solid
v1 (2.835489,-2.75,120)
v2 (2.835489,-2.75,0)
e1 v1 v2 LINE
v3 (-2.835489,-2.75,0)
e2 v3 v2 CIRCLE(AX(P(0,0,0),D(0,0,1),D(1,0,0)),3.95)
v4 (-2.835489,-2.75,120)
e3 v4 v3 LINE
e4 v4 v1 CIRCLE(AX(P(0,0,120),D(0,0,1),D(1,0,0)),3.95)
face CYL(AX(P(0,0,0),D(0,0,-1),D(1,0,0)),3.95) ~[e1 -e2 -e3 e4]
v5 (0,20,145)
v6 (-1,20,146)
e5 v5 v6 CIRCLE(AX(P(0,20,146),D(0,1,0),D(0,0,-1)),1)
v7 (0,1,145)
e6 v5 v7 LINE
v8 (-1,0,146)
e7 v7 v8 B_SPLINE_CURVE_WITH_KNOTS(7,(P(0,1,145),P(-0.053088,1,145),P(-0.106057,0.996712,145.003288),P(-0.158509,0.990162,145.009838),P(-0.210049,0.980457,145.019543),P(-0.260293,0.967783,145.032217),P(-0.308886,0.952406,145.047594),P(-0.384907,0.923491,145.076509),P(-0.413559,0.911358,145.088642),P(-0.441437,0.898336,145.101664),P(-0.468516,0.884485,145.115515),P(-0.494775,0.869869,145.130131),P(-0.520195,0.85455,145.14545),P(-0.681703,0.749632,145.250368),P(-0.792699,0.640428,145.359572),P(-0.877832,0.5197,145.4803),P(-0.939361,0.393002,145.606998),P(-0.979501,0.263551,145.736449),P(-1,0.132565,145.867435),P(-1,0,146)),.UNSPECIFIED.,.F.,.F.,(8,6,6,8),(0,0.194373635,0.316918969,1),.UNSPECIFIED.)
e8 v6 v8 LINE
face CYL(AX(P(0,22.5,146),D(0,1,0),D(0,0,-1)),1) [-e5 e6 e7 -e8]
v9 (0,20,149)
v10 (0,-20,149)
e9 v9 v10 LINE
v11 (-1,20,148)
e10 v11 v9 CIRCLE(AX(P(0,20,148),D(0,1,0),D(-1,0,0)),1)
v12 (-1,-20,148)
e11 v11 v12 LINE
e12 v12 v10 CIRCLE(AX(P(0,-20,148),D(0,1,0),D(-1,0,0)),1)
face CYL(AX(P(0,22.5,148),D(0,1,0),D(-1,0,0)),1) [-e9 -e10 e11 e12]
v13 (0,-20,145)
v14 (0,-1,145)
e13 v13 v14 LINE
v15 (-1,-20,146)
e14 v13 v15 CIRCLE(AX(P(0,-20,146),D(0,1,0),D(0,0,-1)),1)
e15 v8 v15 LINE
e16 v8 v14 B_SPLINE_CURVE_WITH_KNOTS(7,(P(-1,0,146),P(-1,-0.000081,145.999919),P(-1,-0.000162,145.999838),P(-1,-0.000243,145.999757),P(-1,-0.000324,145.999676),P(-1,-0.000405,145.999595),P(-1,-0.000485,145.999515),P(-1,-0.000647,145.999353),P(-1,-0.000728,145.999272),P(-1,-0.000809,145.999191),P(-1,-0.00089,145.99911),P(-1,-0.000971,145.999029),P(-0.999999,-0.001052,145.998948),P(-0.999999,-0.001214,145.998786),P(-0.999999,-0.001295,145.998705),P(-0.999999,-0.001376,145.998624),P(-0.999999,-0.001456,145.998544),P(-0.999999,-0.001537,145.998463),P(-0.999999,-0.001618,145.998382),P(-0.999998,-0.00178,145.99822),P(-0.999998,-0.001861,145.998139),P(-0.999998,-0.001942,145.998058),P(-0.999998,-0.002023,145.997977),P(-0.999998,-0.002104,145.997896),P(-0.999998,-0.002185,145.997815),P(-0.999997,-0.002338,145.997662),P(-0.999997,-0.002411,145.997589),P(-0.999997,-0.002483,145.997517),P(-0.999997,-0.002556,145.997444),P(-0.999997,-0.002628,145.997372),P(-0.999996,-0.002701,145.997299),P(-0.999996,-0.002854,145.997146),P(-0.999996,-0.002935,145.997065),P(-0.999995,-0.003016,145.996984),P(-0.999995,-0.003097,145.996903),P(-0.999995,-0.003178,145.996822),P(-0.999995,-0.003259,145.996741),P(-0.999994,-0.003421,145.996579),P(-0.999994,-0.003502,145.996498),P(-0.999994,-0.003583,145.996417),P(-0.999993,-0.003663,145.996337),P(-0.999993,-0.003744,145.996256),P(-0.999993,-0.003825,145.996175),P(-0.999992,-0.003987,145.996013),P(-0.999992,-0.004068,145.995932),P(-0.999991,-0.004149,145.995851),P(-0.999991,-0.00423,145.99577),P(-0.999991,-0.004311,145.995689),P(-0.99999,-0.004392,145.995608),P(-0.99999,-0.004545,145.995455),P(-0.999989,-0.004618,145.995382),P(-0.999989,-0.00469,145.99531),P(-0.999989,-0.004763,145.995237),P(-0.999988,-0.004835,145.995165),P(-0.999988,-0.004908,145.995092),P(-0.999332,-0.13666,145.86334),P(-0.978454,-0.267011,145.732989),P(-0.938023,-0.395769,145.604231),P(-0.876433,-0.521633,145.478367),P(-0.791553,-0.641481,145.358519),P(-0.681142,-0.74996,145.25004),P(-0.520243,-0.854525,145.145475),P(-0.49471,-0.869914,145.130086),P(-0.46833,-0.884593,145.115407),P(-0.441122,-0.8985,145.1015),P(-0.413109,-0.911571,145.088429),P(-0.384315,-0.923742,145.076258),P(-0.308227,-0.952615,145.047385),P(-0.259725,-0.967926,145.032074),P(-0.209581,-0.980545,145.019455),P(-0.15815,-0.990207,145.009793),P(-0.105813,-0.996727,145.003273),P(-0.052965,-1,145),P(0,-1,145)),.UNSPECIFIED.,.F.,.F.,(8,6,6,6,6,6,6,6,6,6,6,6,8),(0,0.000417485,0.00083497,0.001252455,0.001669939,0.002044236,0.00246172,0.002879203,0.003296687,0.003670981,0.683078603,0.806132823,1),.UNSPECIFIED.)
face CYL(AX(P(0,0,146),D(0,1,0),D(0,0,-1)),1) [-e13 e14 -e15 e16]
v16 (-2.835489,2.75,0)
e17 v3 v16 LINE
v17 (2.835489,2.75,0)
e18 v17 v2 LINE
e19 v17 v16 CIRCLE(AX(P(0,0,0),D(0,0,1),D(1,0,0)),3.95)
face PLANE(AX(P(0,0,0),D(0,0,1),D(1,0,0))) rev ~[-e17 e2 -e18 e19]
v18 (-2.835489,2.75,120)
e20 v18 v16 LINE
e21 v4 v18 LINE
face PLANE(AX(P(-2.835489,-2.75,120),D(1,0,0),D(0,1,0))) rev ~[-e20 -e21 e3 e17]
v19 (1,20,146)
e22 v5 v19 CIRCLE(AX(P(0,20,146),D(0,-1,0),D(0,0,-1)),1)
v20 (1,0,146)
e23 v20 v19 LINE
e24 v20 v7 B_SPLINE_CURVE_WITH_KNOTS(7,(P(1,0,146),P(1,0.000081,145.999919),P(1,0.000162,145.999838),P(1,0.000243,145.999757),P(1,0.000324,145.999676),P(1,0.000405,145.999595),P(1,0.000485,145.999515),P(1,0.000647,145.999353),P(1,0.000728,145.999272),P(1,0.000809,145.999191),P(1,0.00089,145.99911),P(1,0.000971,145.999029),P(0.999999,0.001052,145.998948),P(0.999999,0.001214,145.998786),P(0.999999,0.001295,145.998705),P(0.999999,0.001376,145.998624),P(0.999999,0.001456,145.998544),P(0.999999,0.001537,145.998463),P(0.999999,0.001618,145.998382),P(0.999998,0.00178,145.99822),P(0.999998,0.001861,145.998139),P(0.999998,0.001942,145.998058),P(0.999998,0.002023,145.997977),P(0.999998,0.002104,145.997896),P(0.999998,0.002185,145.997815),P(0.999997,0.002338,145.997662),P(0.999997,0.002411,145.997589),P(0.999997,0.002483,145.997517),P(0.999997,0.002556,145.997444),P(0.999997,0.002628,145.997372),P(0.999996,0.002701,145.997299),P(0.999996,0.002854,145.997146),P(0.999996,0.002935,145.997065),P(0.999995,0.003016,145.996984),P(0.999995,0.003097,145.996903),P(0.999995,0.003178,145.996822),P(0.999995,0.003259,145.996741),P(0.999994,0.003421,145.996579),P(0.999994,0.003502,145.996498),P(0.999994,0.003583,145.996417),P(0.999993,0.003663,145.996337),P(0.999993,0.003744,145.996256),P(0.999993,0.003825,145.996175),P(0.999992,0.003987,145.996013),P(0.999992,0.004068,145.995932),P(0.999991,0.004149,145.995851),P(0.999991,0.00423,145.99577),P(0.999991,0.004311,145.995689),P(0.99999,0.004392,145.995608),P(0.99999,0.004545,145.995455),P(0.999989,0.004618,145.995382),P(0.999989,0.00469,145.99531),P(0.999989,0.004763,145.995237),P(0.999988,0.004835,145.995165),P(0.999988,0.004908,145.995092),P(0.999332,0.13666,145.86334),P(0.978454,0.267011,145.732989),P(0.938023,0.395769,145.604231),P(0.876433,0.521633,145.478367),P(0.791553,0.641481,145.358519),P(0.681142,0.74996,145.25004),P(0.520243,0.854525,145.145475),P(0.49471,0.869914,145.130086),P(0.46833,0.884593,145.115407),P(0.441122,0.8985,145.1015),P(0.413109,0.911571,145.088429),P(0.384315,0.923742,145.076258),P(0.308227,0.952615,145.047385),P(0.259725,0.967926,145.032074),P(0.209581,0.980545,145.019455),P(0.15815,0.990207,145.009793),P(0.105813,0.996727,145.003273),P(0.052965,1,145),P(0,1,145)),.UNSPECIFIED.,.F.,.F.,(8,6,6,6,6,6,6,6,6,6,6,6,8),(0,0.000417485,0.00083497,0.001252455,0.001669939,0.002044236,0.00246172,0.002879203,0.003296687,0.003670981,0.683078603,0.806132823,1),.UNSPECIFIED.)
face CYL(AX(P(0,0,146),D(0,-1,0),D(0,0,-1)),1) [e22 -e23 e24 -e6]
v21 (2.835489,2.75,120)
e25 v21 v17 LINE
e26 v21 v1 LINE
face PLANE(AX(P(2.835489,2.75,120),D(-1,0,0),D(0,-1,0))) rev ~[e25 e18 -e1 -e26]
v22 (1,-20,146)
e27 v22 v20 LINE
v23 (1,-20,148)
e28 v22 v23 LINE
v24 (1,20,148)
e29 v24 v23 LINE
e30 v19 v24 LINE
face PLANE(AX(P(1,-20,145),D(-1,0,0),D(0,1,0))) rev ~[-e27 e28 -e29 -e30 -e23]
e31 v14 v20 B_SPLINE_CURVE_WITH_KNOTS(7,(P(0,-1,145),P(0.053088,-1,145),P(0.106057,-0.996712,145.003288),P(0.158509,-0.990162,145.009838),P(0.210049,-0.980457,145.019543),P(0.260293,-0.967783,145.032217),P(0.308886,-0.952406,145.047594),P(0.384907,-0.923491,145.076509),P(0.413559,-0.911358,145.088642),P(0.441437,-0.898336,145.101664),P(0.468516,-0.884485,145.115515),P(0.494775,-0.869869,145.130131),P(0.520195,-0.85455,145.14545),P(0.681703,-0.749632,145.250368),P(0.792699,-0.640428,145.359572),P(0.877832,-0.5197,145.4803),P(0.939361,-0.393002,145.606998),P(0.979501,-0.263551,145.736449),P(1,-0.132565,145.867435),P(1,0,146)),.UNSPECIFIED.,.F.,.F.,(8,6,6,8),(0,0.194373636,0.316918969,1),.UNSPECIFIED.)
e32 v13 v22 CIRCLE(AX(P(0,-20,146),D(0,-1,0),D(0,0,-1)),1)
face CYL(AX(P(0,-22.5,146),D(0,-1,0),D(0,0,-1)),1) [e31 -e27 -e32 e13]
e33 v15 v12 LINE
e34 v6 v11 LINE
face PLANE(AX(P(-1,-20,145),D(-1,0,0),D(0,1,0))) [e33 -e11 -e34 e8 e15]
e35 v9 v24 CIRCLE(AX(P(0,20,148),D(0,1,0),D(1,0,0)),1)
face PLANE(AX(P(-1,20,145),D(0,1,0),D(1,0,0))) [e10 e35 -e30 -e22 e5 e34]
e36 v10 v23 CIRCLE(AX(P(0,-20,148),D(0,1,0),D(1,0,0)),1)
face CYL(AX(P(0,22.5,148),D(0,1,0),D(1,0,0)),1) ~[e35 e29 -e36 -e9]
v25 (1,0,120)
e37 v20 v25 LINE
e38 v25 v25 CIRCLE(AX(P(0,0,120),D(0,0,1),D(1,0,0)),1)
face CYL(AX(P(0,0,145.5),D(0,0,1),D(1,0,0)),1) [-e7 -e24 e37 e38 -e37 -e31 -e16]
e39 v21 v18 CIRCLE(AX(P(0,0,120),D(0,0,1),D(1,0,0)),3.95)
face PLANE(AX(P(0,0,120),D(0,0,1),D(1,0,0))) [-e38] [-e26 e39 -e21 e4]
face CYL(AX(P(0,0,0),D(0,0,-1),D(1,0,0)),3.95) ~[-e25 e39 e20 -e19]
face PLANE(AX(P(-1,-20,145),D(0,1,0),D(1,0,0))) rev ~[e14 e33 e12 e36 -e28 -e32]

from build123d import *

# Parameters (mm, degrees)
F0_R         = 3.95
F1_DEPTH     = 120
F3_DEPTH     = 120.001
F4_R         = 1
F5_DEPTH     = 25
F6_W         = 2
F6_H         = 40
F7_DEPTH     = 4
F8_T1_DEPTH  = 45
F8_T6_DEPTH  = 22.5
F8_S7_R      = 1
F8_T8_DEPTH  = 13
F8_T12_DEPTH = 22.5
F8_S13_R     = 1
F8_T14_DEPTH = 13
F8_T18_DEPTH = 22.5
F8_S19_R     = 1
F8_T20_DEPTH = 13
F8_T24_DEPTH = 22.5
F8_S25_R     = 1
F8_T26_DEPTH = 13


# Not quite as in the source:
# - a fillet or chamfer that OpenCascade refuses, or shapes differently, is made with other operations: its cross-section is extruded or revolved along the edge and cut away or added


with BuildPart() as f1:
    # F0 (on Top) → F1 (new body)
    with BuildSketch(Plane.XY):
        Circle(F0_R)
    extrude(amount=F1_DEPTH)

    # F2 (on face) → F3 (cut, through all)
    with BuildSketch(Plane.XY.offset(120)):
        with BuildLine():
            Line((-2.8354893758, -2.75), (-2.8354893758, 2.75))
            ThreePointArc((-2.8354893758, 2.75), (-3.95, 0), (-2.8354893758, -2.75))
        make_face()
        with BuildLine():
            ThreePointArc((3.95, 0), (3.6607842762, 1.4836301705), (2.8354893758, 2.75))
            Line((2.8354893758, 2.75), (2.8354893758, -2.75))
            ThreePointArc((2.8354893758, -2.75), (3.6607842762, -1.4836301705), (3.95, 0))
        make_face()
    extrude(amount=-F3_DEPTH, mode=Mode.SUBTRACT)

    # F4 (on face) → F5 (join)
    with BuildSketch(Plane.XY.offset(120)):
        Circle(F4_R)
    extrude(amount=F5_DEPTH)

    # F6 (on face) → F7 (join)
    with BuildSketch(Plane.XY.offset(145)):
        Rectangle(F6_W, F6_H)
    extrude(amount=F7_DEPTH)

    # F8: fillet of radius 1 on 6 edges, made by hand

    # F8_s2 → F8_t1 (cut)
    with BuildSketch(Plane.XZ.offset(-22.5)):
        with BuildLine():
            ThreePointArc((1, 148), (0.7071067812, 148.7071067812), (0, 149))
            Line((0, 149), (1, 149))
            Line((1, 149), (1, 148))
        make_face()
        with BuildLine():
            ThreePointArc((-1, 148), (-0.7071067812, 148.7071067812), (0, 149))
            Line((0, 149), (-1, 149))
            Line((-1, 149), (-1, 148))
        make_face()
    extrude(amount=F8_T1_DEPTH, mode=Mode.SUBTRACT)


with BuildPart() as f8_tool4:
    # F8_s5 → F8_t6 (new body)
    with BuildSketch(Plane.XZ.offset(22.5)):
        with BuildLine():
            ThreePointArc((0, 145), (0.7071067812, 145.2928932188), (1, 146))
            Line((1, 146), (1, 145))
            Line((1, 145), (0, 145))
        make_face()
    extrude(amount=-F8_T6_DEPTH)

    # F8_s7 → F8_t8 (cut, symmetric)
    with BuildSketch(Plane.XY.offset(145.5)):
        Circle(F8_S7_R)
    extrude(amount=F8_T8_DEPTH, both=True, mode=Mode.SUBTRACT)


with BuildPart() as f1_1:
    add(f1.part)

    # F8_t3: cut F8_tool4
    add(f8_tool4.part, mode=Mode.SUBTRACT)


with BuildPart() as f8_tool10:
    # F8_s11 → F8_t12 (new body)
    with BuildSketch(Plane.XZ):
        with BuildLine():
            ThreePointArc((0, 145), (-0.7071067812, 145.2928932188), (-1, 146))
            Line((-1, 146), (-1, 145))
            Line((-1, 145), (0, 145))
        make_face()
    extrude(amount=F8_T12_DEPTH)

    # F8_s13 → F8_t14 (cut, symmetric)
    with BuildSketch(Plane.XY.offset(145.5)):
        Circle(F8_S13_R)
    extrude(amount=F8_T14_DEPTH, both=True, mode=Mode.SUBTRACT)


with BuildPart() as f1_2:
    add(f1_1.part)

    # F8_t9: cut F8_tool10
    add(f8_tool10.part, mode=Mode.SUBTRACT)


with BuildPart() as f8_tool16:
    # F8_s17 → F8_t18 (new body)
    with BuildSketch(Plane.XZ.offset(-22.5)):
        with BuildLine():
            ThreePointArc((0, 145), (-0.7071067812, 145.2928932188), (-1, 146))
            Line((-1, 146), (-1, 145))
            Line((-1, 145), (0, 145))
        make_face()
    extrude(amount=F8_T18_DEPTH)

    # F8_s19 → F8_t20 (cut, symmetric)
    with BuildSketch(Plane.XY.offset(145.5)):
        Circle(F8_S19_R)
    extrude(amount=F8_T20_DEPTH, both=True, mode=Mode.SUBTRACT)


with BuildPart() as f1_3:
    add(f1_2.part)

    # F8_t15: cut F8_tool16
    add(f8_tool16.part, mode=Mode.SUBTRACT)


with BuildPart() as f8_tool22:
    # F8_s23 → F8_t24 (new body)
    with BuildSketch(Plane.XZ):
        with BuildLine():
            ThreePointArc((0, 145), (0.7071067812, 145.2928932188), (1, 146))
            Line((1, 146), (1, 145))
            Line((1, 145), (0, 145))
        make_face()
    extrude(amount=-F8_T24_DEPTH)

    # F8_s25 → F8_t26 (cut, symmetric)
    with BuildSketch(Plane.XY.offset(145.5)):
        Circle(F8_S25_R)
    extrude(amount=F8_T26_DEPTH, both=True, mode=Mode.SUBTRACT)


with BuildPart() as f1_4:
    add(f1_3.part)

    # F8_t21: cut F8_tool22
    add(f8_tool22.part, mode=Mode.SUBTRACT)


solid = f1_4.part
